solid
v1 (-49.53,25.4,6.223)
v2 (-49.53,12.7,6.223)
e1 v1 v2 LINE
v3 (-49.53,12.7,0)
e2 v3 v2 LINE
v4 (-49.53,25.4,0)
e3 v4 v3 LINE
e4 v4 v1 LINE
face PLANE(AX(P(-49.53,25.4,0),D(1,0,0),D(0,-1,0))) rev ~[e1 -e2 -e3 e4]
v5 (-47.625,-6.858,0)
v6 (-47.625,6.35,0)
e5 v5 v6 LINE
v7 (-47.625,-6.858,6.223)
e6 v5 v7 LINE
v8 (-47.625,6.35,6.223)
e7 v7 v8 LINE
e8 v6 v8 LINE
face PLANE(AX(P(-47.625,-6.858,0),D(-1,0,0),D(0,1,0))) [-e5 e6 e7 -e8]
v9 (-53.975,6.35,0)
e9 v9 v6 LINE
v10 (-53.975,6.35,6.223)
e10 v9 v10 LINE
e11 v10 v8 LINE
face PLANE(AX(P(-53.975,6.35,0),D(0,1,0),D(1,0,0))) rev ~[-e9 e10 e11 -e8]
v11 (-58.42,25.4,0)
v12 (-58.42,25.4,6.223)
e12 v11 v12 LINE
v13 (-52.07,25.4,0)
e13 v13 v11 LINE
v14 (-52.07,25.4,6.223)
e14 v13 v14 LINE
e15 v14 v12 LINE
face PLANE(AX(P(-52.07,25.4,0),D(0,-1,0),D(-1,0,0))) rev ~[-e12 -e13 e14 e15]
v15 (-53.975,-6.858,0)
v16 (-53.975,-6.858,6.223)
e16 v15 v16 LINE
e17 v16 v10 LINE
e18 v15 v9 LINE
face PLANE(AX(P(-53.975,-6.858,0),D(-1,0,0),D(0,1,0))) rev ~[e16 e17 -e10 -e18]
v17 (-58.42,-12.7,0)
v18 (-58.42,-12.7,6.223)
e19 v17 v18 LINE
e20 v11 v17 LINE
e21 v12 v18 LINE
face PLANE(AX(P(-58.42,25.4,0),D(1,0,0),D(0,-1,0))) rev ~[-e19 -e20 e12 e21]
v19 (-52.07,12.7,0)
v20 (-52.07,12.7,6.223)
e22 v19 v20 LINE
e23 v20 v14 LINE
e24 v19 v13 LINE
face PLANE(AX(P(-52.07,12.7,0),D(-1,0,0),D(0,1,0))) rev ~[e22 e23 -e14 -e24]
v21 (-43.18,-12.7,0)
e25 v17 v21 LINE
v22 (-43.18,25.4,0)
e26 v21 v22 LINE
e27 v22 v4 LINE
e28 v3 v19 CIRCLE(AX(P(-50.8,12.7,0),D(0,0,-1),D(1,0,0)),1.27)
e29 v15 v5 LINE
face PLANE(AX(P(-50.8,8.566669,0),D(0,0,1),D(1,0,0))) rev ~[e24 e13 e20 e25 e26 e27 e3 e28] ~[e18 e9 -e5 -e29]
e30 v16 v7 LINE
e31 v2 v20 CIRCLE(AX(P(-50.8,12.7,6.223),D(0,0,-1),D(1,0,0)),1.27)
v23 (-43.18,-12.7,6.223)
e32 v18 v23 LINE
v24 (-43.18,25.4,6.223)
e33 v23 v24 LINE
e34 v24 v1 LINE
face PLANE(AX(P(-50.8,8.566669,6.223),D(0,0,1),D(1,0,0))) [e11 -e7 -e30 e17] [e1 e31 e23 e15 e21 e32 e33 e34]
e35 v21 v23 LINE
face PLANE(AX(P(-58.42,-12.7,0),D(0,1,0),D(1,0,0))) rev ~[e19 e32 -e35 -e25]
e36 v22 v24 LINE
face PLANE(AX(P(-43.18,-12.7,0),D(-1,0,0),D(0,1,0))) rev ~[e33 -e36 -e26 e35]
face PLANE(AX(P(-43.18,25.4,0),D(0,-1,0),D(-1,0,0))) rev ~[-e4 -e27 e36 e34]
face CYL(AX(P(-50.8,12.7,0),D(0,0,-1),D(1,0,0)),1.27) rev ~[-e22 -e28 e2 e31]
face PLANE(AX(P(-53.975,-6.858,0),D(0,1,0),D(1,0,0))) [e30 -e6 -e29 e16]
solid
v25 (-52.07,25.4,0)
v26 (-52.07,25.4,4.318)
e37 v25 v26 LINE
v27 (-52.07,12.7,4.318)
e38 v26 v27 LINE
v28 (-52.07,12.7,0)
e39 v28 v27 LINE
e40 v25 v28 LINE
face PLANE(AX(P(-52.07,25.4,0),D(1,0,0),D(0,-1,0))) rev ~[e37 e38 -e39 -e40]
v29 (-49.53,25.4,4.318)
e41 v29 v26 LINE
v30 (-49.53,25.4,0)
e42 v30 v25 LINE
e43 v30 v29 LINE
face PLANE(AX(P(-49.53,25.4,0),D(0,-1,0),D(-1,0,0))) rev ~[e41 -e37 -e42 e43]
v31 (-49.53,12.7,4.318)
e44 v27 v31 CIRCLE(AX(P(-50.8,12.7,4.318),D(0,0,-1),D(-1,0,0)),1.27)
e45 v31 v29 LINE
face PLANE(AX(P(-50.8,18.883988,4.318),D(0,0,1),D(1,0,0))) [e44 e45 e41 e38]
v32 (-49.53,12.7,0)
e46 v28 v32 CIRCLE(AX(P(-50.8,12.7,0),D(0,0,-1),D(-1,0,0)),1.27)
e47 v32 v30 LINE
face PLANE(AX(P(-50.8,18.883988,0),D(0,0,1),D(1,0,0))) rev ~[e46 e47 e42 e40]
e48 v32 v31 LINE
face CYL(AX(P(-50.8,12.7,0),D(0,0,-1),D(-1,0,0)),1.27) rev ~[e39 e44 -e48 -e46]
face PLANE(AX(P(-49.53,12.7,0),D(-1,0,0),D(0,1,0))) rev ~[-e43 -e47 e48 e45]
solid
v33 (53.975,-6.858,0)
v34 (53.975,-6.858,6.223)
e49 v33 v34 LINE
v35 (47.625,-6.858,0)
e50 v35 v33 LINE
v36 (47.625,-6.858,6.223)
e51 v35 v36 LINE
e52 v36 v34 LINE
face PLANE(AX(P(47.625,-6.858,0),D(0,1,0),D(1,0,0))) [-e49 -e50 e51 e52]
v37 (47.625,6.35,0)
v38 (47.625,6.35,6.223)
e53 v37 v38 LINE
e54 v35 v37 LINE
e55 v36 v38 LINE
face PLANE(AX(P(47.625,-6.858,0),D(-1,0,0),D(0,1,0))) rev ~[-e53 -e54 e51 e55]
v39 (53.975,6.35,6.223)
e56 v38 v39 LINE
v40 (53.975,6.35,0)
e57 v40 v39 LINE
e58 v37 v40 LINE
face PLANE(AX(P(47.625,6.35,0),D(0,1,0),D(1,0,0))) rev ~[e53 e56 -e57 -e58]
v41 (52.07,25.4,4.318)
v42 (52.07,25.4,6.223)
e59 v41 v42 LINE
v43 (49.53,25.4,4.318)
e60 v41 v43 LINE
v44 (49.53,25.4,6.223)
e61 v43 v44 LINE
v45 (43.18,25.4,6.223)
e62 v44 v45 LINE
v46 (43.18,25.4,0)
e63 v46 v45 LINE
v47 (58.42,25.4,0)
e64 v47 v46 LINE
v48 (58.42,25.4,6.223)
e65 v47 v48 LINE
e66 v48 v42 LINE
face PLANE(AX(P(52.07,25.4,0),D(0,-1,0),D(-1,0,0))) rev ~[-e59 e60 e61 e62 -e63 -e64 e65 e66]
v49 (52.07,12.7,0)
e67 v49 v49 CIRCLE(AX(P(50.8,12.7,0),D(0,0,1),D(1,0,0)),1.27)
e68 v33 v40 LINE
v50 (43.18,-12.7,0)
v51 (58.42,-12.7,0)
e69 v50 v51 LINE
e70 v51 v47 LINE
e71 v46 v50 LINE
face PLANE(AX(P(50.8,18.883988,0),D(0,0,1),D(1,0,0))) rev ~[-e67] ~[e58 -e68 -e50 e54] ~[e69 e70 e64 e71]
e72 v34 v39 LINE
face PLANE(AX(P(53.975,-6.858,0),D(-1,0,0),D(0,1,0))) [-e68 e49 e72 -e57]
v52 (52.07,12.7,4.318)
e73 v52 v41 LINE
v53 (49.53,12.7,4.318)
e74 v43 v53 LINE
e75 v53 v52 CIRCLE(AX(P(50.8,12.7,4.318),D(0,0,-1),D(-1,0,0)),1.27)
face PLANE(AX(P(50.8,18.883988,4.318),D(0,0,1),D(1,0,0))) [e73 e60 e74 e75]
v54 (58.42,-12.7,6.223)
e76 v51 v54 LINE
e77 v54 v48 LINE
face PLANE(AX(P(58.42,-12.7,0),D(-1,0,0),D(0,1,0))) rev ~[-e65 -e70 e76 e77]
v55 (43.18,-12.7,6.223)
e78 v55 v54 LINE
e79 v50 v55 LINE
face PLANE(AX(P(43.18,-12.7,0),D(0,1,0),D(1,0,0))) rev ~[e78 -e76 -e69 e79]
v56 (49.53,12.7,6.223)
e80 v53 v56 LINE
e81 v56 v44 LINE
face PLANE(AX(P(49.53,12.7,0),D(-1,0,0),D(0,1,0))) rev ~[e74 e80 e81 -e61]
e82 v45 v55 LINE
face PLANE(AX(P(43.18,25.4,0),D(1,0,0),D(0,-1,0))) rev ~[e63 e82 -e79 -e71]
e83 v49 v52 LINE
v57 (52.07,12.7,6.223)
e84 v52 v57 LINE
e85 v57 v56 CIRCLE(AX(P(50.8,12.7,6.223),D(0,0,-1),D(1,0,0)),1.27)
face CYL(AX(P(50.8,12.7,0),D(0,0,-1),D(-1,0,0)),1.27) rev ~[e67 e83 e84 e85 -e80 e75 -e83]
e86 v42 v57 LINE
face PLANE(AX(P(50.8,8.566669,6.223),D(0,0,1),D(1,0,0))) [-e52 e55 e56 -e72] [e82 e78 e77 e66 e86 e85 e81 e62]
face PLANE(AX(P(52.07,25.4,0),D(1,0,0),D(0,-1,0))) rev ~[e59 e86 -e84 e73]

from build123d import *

# Parameters (mm, degrees)
F0_W     = 6.35
F0_H     = 13.208
F1_DEPTH = 6.223
F2_DEPTH = 4.318


with BuildPart() as f1:
    # F0 (on Top) → F1 (new body)
    with BuildSketch(Plane.XY):
        with BuildLine():
            Line((43.18, -12.7), (58.42, -12.7))
            Line((58.42, -12.7), (58.42, 25.4))
            Line((58.42, 25.4), (52.07, 25.4))
            Line((52.07, 25.4), (52.07, 12.7))
            ThreePointArc((52.07, 12.7), (50.8, 11.43), (49.53, 12.7))
            Line((49.53, 12.7), (49.53, 25.4))
            Line((49.53, 25.4), (43.18, 25.4))
            Line((43.18, 25.4), (43.18, -12.7))
        make_face()
        with Locations((50.8, -0.254)):
            Rectangle(F0_W, F0_H, mode=Mode.SUBTRACT)
    extrude(amount=F1_DEPTH)

    # F0 (on Top) → F2 (join)
    with BuildSketch(Plane.XY):
        with BuildLine():
            Line((52.07, 12.7), (52.07, 25.4))
            Line((52.07, 25.4), (49.53, 25.4))
            Line((49.53, 25.4), (49.53, 12.7))
            ThreePointArc((49.53, 12.7), (50.8, 13.97), (52.07, 12.7))
        make_face()
    extrude(amount=F2_DEPTH)


with BuildPart() as f1b:
    # F0 (on Top) → F1, piece 2 (new body)
    with BuildSketch(Plane.XY):
        with BuildLine():
            Line((-58.42, 25.4), (-58.42, -12.7))
            Line((-58.42, -12.7), (-43.18, -12.7))
            Line((-43.18, -12.7), (-43.18, 25.4))
            Line((-43.18, 25.4), (-49.53, 25.4))
            Line((-49.53, 25.4), (-49.53, 12.7))
            ThreePointArc((-49.53, 12.7), (-50.8, 11.43), (-52.07, 12.7))
            Line((-52.07, 12.7), (-52.07, 25.4))
            Line((-52.07, 25.4), (-58.42, 25.4))
        make_face()
        with Locations((-50.8, -0.254)):
            Rectangle(F0_W, F0_H, mode=Mode.SUBTRACT)
    extrude(amount=F1_DEPTH)


with BuildPart() as f2:
    # F0 (on Top) → F2, piece 2 (new body)
    with BuildSketch(Plane.XY):
        with BuildLine():
            Line((-49.53, 25.4), (-52.07, 25.4))
            Line((-52.07, 25.4), (-52.07, 12.7))
            ThreePointArc((-52.07, 12.7), (-50.8, 13.97), (-49.53, 12.7))
            Line((-49.53, 12.7), (-49.53, 25.4))
        make_face()
    extrude(amount=F2_DEPTH)


solid = Compound([f1.part, f1b.part, f2.part])
